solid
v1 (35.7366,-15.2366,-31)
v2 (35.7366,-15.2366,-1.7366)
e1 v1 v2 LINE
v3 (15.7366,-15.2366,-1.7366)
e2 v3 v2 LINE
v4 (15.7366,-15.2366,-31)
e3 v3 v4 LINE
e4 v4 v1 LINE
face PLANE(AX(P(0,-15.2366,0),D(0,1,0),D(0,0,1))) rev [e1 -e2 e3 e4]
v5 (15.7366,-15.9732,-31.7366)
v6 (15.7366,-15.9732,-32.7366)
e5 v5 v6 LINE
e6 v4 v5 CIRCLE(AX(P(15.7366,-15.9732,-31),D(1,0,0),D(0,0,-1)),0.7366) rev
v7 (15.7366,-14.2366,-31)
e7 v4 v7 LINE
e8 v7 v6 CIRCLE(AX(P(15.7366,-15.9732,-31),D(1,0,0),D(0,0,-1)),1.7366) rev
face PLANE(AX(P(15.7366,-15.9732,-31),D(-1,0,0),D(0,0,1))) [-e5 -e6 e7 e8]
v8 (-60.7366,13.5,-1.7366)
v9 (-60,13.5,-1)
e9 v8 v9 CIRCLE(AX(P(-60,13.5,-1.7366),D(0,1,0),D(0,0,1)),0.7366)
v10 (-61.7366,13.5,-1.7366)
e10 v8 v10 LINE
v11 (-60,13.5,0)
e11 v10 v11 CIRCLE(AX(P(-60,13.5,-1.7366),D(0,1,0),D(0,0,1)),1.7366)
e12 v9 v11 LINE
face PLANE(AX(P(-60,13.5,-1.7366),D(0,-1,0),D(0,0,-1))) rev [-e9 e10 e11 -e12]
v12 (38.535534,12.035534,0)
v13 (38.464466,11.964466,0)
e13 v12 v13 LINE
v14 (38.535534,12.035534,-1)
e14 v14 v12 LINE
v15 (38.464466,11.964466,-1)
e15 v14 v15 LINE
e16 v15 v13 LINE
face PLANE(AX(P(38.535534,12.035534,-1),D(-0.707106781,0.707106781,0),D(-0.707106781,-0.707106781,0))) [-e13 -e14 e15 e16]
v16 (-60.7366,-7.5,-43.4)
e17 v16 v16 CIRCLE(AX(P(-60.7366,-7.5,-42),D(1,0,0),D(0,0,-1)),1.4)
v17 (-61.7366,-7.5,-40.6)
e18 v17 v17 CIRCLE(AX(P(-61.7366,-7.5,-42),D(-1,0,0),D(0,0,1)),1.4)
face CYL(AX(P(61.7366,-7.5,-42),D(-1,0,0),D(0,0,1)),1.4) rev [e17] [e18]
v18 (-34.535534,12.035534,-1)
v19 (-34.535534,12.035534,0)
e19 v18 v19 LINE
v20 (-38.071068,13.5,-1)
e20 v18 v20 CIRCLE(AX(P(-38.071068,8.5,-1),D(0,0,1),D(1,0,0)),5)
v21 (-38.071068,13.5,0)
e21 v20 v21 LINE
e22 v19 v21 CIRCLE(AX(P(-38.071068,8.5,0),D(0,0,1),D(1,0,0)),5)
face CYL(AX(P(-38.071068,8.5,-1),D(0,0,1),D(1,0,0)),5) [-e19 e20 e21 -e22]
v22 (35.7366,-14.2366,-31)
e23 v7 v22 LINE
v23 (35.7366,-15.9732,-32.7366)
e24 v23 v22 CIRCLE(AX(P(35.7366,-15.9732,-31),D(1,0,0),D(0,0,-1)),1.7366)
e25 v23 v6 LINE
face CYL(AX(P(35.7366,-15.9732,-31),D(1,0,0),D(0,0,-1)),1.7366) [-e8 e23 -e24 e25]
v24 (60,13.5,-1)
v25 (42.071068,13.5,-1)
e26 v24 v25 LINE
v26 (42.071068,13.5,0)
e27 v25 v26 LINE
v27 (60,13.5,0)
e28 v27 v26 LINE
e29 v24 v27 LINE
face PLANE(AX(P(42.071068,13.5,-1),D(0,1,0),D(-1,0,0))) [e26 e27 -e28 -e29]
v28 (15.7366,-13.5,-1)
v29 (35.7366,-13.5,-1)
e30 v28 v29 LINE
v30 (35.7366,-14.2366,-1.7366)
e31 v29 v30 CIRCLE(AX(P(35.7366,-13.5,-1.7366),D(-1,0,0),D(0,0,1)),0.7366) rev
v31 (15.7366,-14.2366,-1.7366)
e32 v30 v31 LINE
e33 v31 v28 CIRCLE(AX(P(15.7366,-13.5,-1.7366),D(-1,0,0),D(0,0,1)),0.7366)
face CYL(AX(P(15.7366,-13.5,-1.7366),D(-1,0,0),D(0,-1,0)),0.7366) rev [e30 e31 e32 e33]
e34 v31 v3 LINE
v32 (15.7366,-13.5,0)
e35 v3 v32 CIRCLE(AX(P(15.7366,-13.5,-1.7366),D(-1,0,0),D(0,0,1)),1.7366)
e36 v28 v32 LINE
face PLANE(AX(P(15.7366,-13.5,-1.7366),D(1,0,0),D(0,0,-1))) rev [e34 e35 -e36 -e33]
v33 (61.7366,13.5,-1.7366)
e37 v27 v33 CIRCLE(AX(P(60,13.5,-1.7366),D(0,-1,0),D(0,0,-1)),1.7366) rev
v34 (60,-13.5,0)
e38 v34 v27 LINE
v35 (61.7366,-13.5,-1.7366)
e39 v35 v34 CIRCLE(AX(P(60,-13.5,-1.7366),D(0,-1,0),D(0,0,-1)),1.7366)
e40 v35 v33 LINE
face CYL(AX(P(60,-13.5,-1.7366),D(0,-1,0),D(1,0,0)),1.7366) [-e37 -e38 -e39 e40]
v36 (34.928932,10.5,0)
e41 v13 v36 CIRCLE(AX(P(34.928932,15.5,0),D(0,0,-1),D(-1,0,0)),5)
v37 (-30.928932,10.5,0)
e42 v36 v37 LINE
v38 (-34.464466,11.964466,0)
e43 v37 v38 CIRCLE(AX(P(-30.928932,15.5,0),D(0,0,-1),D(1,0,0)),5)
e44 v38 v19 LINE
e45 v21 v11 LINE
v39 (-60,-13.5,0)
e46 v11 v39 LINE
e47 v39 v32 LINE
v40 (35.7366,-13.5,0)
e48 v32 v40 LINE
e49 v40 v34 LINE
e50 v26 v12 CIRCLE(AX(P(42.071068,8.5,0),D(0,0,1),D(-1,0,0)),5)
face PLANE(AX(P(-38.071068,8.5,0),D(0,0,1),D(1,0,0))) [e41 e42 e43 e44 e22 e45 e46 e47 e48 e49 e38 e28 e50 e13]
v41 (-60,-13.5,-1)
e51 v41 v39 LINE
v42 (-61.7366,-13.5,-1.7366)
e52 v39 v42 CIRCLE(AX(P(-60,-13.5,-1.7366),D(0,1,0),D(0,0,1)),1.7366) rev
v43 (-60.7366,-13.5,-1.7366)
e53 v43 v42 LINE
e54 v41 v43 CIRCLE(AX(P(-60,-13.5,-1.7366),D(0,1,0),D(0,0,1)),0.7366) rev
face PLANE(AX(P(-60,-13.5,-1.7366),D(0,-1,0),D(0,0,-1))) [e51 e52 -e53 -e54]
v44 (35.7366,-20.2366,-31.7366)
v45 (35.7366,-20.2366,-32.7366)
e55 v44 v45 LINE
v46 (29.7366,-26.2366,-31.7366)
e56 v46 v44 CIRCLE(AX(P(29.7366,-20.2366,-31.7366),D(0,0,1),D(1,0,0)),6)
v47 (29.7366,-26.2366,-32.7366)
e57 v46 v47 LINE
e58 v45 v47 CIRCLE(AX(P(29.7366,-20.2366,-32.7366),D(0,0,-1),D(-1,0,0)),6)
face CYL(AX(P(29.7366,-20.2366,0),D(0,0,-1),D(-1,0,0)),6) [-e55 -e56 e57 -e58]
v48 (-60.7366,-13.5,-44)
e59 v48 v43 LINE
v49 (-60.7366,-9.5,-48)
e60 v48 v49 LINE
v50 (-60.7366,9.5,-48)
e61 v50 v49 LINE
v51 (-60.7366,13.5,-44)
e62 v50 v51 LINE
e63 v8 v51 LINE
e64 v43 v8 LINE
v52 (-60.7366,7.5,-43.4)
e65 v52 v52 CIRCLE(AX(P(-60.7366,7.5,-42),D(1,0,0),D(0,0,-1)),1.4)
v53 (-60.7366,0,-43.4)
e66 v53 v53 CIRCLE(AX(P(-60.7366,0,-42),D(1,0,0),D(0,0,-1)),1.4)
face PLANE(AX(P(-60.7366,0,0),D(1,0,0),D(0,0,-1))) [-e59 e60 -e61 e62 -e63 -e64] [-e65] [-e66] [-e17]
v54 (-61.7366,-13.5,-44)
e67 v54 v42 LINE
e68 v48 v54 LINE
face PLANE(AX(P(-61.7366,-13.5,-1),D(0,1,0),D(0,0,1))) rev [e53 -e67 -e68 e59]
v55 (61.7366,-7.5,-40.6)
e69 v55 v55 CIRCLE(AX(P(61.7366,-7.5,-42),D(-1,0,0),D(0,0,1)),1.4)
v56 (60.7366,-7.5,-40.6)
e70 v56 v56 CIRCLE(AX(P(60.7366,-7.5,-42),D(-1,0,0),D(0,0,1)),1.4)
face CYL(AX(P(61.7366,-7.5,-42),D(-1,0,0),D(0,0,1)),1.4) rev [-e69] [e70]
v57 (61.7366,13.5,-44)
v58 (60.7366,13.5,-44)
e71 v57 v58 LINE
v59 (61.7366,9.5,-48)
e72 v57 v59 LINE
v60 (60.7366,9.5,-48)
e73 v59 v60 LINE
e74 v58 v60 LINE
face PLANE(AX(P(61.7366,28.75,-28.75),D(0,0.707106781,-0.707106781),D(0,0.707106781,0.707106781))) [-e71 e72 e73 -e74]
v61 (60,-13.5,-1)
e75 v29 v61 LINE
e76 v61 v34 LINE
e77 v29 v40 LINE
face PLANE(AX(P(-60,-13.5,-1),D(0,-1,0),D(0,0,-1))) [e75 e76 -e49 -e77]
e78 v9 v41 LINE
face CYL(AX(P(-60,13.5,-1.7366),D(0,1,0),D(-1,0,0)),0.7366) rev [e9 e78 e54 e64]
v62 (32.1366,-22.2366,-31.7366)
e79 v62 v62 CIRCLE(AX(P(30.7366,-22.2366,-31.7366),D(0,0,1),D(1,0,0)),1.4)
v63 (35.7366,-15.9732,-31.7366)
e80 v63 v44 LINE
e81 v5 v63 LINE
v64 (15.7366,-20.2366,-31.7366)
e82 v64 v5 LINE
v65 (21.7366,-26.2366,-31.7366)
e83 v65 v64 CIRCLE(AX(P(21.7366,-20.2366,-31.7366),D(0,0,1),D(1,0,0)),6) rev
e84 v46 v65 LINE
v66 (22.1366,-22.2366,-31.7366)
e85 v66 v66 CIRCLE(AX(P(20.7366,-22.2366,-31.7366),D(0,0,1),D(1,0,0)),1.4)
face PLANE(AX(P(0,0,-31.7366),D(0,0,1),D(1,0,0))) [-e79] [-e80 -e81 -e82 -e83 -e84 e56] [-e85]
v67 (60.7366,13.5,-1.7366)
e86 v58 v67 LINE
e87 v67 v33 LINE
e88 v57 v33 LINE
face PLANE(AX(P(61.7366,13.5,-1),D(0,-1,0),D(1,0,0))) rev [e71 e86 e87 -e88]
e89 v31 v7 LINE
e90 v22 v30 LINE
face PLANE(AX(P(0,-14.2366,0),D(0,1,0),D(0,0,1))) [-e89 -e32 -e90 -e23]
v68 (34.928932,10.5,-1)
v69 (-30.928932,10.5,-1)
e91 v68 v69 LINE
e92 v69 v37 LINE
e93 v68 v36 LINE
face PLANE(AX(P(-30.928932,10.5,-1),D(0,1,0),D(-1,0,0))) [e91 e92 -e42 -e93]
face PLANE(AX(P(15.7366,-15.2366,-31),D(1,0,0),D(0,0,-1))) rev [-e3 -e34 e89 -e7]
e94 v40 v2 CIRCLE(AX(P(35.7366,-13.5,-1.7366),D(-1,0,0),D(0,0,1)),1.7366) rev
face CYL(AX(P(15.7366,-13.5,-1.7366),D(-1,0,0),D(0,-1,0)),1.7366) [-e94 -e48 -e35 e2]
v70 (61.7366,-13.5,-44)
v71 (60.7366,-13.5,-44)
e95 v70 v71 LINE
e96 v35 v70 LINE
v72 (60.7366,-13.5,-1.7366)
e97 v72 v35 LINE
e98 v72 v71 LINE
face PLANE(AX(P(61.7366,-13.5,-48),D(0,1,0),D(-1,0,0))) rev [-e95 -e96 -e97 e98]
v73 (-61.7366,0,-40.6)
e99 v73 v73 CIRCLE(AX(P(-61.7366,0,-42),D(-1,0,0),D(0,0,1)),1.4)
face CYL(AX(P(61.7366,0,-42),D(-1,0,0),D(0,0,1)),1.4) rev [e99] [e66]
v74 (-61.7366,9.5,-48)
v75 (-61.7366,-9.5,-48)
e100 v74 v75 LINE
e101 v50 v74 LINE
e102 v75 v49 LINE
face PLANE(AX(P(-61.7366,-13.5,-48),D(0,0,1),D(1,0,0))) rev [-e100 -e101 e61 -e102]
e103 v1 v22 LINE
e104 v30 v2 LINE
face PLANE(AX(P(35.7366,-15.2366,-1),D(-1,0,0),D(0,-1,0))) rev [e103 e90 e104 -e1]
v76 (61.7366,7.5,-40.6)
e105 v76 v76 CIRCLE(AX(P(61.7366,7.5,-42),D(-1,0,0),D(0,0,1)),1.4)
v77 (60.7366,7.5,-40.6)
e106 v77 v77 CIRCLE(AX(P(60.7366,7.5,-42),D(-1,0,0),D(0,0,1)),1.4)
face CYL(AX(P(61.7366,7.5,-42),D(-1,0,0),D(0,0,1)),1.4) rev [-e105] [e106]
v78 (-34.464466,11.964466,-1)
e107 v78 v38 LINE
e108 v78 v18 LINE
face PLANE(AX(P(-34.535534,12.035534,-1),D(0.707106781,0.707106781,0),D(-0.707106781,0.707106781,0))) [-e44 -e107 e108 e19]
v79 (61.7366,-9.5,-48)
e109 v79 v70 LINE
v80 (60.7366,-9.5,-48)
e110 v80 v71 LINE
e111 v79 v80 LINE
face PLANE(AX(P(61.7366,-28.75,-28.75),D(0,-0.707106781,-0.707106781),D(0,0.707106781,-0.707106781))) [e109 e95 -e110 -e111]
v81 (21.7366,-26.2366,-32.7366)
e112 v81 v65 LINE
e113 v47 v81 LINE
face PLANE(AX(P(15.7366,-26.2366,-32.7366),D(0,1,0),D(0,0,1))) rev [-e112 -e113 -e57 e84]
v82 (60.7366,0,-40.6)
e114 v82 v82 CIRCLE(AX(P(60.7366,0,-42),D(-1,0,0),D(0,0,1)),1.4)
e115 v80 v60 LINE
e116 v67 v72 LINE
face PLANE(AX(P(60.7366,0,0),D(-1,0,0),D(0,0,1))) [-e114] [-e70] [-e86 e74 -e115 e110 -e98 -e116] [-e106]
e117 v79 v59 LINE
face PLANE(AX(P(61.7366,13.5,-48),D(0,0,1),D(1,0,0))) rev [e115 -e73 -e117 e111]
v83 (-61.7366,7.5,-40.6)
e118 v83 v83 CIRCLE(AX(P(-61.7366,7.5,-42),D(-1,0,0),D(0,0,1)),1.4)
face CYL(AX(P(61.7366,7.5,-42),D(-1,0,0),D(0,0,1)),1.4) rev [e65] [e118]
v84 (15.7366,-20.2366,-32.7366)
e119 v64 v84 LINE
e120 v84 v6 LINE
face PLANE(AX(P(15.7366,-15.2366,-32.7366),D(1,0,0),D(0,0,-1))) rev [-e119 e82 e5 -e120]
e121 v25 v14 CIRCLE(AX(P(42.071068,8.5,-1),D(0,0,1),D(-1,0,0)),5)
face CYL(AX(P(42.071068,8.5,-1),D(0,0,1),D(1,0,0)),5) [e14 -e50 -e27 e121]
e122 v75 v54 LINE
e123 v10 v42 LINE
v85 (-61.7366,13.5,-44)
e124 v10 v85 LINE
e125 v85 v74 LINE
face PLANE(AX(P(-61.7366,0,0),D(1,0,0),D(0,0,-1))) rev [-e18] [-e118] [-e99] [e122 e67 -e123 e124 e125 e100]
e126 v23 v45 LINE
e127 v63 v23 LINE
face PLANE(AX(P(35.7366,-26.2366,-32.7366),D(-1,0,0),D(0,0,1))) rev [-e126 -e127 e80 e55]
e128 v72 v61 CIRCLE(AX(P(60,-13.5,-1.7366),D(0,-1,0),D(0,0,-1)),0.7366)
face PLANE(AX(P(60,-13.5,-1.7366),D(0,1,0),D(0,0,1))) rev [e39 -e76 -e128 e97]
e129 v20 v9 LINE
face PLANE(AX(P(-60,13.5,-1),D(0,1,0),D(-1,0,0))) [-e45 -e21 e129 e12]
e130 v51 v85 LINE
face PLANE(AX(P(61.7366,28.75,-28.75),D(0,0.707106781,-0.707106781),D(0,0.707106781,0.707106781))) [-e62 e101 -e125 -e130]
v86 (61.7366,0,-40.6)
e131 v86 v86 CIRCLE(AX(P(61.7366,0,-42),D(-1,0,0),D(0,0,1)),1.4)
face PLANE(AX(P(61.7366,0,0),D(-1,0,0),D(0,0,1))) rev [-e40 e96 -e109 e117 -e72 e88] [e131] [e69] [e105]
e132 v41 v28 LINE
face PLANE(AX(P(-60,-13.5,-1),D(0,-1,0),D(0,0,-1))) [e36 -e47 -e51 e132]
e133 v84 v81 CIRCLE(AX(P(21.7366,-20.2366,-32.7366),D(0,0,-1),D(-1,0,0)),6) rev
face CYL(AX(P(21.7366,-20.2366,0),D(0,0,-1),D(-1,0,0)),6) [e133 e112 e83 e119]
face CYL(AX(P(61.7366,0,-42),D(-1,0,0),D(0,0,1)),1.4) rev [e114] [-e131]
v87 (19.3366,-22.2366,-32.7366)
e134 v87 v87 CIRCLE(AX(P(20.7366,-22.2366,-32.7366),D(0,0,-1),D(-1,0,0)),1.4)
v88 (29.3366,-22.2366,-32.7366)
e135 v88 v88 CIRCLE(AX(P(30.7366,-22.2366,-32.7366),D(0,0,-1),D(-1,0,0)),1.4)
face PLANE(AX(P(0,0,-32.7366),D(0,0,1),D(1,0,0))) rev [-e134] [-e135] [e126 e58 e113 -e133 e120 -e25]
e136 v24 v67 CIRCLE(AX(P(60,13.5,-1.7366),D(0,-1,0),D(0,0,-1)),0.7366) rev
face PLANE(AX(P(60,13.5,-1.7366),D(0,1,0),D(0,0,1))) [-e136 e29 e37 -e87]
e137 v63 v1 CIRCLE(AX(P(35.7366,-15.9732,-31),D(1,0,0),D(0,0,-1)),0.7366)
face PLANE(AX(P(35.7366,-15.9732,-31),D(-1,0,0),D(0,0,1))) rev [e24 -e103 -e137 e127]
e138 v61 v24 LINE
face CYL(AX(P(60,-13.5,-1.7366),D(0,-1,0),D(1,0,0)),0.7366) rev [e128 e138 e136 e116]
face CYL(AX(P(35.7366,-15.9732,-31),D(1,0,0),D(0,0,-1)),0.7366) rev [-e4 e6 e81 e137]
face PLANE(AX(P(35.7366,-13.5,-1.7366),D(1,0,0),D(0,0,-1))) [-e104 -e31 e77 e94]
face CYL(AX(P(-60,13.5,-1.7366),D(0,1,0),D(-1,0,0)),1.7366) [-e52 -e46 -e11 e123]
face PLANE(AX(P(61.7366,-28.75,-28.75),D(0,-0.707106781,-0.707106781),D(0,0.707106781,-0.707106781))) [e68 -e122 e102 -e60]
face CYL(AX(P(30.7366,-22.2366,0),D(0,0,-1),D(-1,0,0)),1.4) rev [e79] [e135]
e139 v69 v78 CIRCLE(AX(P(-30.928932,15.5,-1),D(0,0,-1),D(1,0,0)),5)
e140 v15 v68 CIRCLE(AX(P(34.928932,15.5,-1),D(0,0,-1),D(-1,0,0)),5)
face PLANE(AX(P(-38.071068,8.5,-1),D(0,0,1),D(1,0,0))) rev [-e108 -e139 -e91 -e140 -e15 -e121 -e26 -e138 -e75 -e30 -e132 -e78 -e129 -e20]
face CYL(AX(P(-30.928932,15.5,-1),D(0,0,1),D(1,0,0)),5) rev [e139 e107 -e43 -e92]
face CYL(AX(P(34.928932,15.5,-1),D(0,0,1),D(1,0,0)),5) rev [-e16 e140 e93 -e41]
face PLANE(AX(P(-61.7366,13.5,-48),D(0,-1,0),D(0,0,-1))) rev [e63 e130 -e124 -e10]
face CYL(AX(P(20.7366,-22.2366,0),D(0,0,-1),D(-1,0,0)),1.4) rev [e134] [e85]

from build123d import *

# Parameters (mm, degrees)
BASE_FLANGE1_DEPTH = 1
EDGE_FLANGE1_DEPTH = 27
EDGE_FLANGE2_DEPTH = 27
EDGE_FLANGE3_DEPTH = 20
EDGE_FLANGE4_DEPTH = 20
SKETCH18_R         = 1.4
CUT_EXTRUDE1_DEPTH = 136.048103644
SKETCH19_R         = 1.4
CUT_EXTRUDE2_DEPTH = 75.642159258


# Sheet-metal steps are written as plain solids
with BuildPart() as part:
    # Sketch1 → Base-Flange1 (new body)
    with BuildSketch(Plane.XY):
        with BuildLine():
            Line((-30.928932188, 10.5), (34.928932188, 10.5))
            ThreePointArc((34.928932188, 10.5), (36.84234935, 10.880602337), (38.464466094, 11.964466094))
            Line((38.464466094, 11.964466094), (38.535533906, 12.035533906))
            ThreePointArc((38.535533906, 12.035533906), (40.15765065, 13.119397663), (42.071067812, 13.5))
            Line((42.071067812, 13.5), (60, 13.5))
            Line((60, 13.5), (60, -13.5))
            Line((60, -13.5), (-60, -13.5))
            Line((-60, -13.5), (-60, 13.5))
            Line((-60, 13.5), (-38.071067812, 13.5))
            ThreePointArc((-38.071067812, 13.5), (-36.15765065, 13.119397663), (-34.535533906, 12.035533906))
            Line((-34.535533906, 12.035533906), (-34.464466094, 11.964466094))
            ThreePointArc((-34.464466094, 11.964466094), (-32.84234935, 10.880602337), (-30.928932188, 10.5))
        make_face()
    extrude(amount=-BASE_FLANGE1_DEPTH)

    # Edge-Flange1 section (across the edge) → Edge-Flange1 (add)
    with BuildSketch(Plane(origin=(60.7366, 13.5, -1), x_dir=(-1, 0, 0), z_dir=(0, -1, 0))):
        with BuildLine():
            Line((-1, 0.7366), (-1, 47))
            Line((-1, 47), (0, 47))
            Line((0, 47), (0, 0.7366))
            ThreePointArc((0, 0.7366), (0.215745145, 0.215745145), (0.7366, 0))
            Line((0.7366, 0), (0.7366, -1))
            ThreePointArc((0.7366, -1), (-0.491361636, -0.491361636), (-1, 0.7366))
        make_face()
    extrude(amount=EDGE_FLANGE1_DEPTH)

    # Edge-Flange2 section (across the edge) → Edge-Flange2 (add)
    with BuildSketch(Plane(origin=(-60.7366, -13.5, -1), x_dir=(1, 0, 0), z_dir=(0, 1, 0))):
        with BuildLine():
            Line((-1, 0.7366), (-1, 47))
            Line((-1, 47), (0, 47))
            Line((0, 47), (0, 0.7366))
            ThreePointArc((0, 0.7366), (0.215745145, 0.215745145), (0.7366, 0))
            Line((0.7366, 0), (0.7366, -1))
            ThreePointArc((0.7366, -1), (-0.491361636, -0.491361636), (-1, 0.7366))
        make_face()
    extrude(amount=EDGE_FLANGE2_DEPTH)

    # Edge-Flange3 section (across the edge) → Edge-Flange3 (add)
    with BuildSketch(Plane(origin=(35.7366, -14.2366, -1), x_dir=(0, 1, 0), z_dir=(-1, 0, 0))):
        with BuildLine():
            Line((-1, 0.7366), (-1, 30))
            Line((-1, 30), (0, 30))
            Line((0, 30), (0, 0.7366))
            ThreePointArc((0, 0.7366), (0.215745145, 0.215745145), (0.7366, 0))
            Line((0.7366, 0), (0.7366, -1))
            ThreePointArc((0.7366, -1), (-0.491361636, -0.491361636), (-1, 0.7366))
        make_face()
    extrude(amount=EDGE_FLANGE3_DEPTH)

    # Edge-Flange4 section (across the edge) → Edge-Flange4 (add)
    with BuildSketch(Plane(origin=(15.7366, -15.2366, -31.7366), x_dir=(0, 0, 1), z_dir=(1, 0, 0))):
        with BuildLine():
            Line((-1, 0.7366), (-1, 11))
            Line((-1, 11), (0, 11))
            Line((0, 11), (0, 0.7366))
            ThreePointArc((0, 0.7366), (0.215745145, 0.215745145), (0.7366, 0))
            Line((0.7366, 0), (0.7366, -1))
            ThreePointArc((0.7366, -1), (-0.491361636, -0.491361636), (-1, 0.7366))
        make_face()
    extrude(amount=EDGE_FLANGE4_DEPTH)

    # Sketch18 → Cut-Extrude1 (cut, through all)
    with BuildSketch(Plane.ZY.offset(61.7366)):
        Polygon((-48, 9.5), (-44, 13.5), (-48, 13.5), align=None)
        Polygon((-48, -13.5), (-44, -13.5), (-48, -9.5), align=None)
        with Locations((-42, 7.5)):
            Circle(SKETCH18_R)
        with Locations((-42, 0)):
            Circle(SKETCH18_R)
        with Locations((-42, -7.5)):
            Circle(SKETCH18_R)
    extrude(amount=-CUT_EXTRUDE1_DEPTH, mode=Mode.SUBTRACT)

    # Sketch19 → Cut-Extrude2 (cut, through all)
    with BuildSketch(Plane(origin=(0, 0, -32.7366), x_dir=(-1, 0, 0), z_dir=(0, 0, -1))):
        with BuildLine():
            ThreePointArc((-15.7366, -20.2366), (-17.493959313, -24.479240687), (-21.7366, -26.2366))
            Line((-21.7366, -26.2366), (-15.7366, -26.2366))
            Line((-15.7366, -26.2366), (-15.7366, -20.2366))
        make_face()
        with BuildLine():
            ThreePointArc((-29.7366, -26.2366), (-33.979240687, -24.479240687), (-35.7366, -20.2366))
            Line((-35.7366, -20.2366), (-35.7366, -26.2366))
            Line((-35.7366, -26.2366), (-29.7366, -26.2366))
        make_face()
        with Locations((-30.7366, -22.2366)):
            Circle(SKETCH19_R)
        with Locations((-20.7366, -22.2366)):
            Circle(SKETCH19_R)
    extrude(amount=-CUT_EXTRUDE2_DEPTH, mode=Mode.SUBTRACT)


solid = part.part
